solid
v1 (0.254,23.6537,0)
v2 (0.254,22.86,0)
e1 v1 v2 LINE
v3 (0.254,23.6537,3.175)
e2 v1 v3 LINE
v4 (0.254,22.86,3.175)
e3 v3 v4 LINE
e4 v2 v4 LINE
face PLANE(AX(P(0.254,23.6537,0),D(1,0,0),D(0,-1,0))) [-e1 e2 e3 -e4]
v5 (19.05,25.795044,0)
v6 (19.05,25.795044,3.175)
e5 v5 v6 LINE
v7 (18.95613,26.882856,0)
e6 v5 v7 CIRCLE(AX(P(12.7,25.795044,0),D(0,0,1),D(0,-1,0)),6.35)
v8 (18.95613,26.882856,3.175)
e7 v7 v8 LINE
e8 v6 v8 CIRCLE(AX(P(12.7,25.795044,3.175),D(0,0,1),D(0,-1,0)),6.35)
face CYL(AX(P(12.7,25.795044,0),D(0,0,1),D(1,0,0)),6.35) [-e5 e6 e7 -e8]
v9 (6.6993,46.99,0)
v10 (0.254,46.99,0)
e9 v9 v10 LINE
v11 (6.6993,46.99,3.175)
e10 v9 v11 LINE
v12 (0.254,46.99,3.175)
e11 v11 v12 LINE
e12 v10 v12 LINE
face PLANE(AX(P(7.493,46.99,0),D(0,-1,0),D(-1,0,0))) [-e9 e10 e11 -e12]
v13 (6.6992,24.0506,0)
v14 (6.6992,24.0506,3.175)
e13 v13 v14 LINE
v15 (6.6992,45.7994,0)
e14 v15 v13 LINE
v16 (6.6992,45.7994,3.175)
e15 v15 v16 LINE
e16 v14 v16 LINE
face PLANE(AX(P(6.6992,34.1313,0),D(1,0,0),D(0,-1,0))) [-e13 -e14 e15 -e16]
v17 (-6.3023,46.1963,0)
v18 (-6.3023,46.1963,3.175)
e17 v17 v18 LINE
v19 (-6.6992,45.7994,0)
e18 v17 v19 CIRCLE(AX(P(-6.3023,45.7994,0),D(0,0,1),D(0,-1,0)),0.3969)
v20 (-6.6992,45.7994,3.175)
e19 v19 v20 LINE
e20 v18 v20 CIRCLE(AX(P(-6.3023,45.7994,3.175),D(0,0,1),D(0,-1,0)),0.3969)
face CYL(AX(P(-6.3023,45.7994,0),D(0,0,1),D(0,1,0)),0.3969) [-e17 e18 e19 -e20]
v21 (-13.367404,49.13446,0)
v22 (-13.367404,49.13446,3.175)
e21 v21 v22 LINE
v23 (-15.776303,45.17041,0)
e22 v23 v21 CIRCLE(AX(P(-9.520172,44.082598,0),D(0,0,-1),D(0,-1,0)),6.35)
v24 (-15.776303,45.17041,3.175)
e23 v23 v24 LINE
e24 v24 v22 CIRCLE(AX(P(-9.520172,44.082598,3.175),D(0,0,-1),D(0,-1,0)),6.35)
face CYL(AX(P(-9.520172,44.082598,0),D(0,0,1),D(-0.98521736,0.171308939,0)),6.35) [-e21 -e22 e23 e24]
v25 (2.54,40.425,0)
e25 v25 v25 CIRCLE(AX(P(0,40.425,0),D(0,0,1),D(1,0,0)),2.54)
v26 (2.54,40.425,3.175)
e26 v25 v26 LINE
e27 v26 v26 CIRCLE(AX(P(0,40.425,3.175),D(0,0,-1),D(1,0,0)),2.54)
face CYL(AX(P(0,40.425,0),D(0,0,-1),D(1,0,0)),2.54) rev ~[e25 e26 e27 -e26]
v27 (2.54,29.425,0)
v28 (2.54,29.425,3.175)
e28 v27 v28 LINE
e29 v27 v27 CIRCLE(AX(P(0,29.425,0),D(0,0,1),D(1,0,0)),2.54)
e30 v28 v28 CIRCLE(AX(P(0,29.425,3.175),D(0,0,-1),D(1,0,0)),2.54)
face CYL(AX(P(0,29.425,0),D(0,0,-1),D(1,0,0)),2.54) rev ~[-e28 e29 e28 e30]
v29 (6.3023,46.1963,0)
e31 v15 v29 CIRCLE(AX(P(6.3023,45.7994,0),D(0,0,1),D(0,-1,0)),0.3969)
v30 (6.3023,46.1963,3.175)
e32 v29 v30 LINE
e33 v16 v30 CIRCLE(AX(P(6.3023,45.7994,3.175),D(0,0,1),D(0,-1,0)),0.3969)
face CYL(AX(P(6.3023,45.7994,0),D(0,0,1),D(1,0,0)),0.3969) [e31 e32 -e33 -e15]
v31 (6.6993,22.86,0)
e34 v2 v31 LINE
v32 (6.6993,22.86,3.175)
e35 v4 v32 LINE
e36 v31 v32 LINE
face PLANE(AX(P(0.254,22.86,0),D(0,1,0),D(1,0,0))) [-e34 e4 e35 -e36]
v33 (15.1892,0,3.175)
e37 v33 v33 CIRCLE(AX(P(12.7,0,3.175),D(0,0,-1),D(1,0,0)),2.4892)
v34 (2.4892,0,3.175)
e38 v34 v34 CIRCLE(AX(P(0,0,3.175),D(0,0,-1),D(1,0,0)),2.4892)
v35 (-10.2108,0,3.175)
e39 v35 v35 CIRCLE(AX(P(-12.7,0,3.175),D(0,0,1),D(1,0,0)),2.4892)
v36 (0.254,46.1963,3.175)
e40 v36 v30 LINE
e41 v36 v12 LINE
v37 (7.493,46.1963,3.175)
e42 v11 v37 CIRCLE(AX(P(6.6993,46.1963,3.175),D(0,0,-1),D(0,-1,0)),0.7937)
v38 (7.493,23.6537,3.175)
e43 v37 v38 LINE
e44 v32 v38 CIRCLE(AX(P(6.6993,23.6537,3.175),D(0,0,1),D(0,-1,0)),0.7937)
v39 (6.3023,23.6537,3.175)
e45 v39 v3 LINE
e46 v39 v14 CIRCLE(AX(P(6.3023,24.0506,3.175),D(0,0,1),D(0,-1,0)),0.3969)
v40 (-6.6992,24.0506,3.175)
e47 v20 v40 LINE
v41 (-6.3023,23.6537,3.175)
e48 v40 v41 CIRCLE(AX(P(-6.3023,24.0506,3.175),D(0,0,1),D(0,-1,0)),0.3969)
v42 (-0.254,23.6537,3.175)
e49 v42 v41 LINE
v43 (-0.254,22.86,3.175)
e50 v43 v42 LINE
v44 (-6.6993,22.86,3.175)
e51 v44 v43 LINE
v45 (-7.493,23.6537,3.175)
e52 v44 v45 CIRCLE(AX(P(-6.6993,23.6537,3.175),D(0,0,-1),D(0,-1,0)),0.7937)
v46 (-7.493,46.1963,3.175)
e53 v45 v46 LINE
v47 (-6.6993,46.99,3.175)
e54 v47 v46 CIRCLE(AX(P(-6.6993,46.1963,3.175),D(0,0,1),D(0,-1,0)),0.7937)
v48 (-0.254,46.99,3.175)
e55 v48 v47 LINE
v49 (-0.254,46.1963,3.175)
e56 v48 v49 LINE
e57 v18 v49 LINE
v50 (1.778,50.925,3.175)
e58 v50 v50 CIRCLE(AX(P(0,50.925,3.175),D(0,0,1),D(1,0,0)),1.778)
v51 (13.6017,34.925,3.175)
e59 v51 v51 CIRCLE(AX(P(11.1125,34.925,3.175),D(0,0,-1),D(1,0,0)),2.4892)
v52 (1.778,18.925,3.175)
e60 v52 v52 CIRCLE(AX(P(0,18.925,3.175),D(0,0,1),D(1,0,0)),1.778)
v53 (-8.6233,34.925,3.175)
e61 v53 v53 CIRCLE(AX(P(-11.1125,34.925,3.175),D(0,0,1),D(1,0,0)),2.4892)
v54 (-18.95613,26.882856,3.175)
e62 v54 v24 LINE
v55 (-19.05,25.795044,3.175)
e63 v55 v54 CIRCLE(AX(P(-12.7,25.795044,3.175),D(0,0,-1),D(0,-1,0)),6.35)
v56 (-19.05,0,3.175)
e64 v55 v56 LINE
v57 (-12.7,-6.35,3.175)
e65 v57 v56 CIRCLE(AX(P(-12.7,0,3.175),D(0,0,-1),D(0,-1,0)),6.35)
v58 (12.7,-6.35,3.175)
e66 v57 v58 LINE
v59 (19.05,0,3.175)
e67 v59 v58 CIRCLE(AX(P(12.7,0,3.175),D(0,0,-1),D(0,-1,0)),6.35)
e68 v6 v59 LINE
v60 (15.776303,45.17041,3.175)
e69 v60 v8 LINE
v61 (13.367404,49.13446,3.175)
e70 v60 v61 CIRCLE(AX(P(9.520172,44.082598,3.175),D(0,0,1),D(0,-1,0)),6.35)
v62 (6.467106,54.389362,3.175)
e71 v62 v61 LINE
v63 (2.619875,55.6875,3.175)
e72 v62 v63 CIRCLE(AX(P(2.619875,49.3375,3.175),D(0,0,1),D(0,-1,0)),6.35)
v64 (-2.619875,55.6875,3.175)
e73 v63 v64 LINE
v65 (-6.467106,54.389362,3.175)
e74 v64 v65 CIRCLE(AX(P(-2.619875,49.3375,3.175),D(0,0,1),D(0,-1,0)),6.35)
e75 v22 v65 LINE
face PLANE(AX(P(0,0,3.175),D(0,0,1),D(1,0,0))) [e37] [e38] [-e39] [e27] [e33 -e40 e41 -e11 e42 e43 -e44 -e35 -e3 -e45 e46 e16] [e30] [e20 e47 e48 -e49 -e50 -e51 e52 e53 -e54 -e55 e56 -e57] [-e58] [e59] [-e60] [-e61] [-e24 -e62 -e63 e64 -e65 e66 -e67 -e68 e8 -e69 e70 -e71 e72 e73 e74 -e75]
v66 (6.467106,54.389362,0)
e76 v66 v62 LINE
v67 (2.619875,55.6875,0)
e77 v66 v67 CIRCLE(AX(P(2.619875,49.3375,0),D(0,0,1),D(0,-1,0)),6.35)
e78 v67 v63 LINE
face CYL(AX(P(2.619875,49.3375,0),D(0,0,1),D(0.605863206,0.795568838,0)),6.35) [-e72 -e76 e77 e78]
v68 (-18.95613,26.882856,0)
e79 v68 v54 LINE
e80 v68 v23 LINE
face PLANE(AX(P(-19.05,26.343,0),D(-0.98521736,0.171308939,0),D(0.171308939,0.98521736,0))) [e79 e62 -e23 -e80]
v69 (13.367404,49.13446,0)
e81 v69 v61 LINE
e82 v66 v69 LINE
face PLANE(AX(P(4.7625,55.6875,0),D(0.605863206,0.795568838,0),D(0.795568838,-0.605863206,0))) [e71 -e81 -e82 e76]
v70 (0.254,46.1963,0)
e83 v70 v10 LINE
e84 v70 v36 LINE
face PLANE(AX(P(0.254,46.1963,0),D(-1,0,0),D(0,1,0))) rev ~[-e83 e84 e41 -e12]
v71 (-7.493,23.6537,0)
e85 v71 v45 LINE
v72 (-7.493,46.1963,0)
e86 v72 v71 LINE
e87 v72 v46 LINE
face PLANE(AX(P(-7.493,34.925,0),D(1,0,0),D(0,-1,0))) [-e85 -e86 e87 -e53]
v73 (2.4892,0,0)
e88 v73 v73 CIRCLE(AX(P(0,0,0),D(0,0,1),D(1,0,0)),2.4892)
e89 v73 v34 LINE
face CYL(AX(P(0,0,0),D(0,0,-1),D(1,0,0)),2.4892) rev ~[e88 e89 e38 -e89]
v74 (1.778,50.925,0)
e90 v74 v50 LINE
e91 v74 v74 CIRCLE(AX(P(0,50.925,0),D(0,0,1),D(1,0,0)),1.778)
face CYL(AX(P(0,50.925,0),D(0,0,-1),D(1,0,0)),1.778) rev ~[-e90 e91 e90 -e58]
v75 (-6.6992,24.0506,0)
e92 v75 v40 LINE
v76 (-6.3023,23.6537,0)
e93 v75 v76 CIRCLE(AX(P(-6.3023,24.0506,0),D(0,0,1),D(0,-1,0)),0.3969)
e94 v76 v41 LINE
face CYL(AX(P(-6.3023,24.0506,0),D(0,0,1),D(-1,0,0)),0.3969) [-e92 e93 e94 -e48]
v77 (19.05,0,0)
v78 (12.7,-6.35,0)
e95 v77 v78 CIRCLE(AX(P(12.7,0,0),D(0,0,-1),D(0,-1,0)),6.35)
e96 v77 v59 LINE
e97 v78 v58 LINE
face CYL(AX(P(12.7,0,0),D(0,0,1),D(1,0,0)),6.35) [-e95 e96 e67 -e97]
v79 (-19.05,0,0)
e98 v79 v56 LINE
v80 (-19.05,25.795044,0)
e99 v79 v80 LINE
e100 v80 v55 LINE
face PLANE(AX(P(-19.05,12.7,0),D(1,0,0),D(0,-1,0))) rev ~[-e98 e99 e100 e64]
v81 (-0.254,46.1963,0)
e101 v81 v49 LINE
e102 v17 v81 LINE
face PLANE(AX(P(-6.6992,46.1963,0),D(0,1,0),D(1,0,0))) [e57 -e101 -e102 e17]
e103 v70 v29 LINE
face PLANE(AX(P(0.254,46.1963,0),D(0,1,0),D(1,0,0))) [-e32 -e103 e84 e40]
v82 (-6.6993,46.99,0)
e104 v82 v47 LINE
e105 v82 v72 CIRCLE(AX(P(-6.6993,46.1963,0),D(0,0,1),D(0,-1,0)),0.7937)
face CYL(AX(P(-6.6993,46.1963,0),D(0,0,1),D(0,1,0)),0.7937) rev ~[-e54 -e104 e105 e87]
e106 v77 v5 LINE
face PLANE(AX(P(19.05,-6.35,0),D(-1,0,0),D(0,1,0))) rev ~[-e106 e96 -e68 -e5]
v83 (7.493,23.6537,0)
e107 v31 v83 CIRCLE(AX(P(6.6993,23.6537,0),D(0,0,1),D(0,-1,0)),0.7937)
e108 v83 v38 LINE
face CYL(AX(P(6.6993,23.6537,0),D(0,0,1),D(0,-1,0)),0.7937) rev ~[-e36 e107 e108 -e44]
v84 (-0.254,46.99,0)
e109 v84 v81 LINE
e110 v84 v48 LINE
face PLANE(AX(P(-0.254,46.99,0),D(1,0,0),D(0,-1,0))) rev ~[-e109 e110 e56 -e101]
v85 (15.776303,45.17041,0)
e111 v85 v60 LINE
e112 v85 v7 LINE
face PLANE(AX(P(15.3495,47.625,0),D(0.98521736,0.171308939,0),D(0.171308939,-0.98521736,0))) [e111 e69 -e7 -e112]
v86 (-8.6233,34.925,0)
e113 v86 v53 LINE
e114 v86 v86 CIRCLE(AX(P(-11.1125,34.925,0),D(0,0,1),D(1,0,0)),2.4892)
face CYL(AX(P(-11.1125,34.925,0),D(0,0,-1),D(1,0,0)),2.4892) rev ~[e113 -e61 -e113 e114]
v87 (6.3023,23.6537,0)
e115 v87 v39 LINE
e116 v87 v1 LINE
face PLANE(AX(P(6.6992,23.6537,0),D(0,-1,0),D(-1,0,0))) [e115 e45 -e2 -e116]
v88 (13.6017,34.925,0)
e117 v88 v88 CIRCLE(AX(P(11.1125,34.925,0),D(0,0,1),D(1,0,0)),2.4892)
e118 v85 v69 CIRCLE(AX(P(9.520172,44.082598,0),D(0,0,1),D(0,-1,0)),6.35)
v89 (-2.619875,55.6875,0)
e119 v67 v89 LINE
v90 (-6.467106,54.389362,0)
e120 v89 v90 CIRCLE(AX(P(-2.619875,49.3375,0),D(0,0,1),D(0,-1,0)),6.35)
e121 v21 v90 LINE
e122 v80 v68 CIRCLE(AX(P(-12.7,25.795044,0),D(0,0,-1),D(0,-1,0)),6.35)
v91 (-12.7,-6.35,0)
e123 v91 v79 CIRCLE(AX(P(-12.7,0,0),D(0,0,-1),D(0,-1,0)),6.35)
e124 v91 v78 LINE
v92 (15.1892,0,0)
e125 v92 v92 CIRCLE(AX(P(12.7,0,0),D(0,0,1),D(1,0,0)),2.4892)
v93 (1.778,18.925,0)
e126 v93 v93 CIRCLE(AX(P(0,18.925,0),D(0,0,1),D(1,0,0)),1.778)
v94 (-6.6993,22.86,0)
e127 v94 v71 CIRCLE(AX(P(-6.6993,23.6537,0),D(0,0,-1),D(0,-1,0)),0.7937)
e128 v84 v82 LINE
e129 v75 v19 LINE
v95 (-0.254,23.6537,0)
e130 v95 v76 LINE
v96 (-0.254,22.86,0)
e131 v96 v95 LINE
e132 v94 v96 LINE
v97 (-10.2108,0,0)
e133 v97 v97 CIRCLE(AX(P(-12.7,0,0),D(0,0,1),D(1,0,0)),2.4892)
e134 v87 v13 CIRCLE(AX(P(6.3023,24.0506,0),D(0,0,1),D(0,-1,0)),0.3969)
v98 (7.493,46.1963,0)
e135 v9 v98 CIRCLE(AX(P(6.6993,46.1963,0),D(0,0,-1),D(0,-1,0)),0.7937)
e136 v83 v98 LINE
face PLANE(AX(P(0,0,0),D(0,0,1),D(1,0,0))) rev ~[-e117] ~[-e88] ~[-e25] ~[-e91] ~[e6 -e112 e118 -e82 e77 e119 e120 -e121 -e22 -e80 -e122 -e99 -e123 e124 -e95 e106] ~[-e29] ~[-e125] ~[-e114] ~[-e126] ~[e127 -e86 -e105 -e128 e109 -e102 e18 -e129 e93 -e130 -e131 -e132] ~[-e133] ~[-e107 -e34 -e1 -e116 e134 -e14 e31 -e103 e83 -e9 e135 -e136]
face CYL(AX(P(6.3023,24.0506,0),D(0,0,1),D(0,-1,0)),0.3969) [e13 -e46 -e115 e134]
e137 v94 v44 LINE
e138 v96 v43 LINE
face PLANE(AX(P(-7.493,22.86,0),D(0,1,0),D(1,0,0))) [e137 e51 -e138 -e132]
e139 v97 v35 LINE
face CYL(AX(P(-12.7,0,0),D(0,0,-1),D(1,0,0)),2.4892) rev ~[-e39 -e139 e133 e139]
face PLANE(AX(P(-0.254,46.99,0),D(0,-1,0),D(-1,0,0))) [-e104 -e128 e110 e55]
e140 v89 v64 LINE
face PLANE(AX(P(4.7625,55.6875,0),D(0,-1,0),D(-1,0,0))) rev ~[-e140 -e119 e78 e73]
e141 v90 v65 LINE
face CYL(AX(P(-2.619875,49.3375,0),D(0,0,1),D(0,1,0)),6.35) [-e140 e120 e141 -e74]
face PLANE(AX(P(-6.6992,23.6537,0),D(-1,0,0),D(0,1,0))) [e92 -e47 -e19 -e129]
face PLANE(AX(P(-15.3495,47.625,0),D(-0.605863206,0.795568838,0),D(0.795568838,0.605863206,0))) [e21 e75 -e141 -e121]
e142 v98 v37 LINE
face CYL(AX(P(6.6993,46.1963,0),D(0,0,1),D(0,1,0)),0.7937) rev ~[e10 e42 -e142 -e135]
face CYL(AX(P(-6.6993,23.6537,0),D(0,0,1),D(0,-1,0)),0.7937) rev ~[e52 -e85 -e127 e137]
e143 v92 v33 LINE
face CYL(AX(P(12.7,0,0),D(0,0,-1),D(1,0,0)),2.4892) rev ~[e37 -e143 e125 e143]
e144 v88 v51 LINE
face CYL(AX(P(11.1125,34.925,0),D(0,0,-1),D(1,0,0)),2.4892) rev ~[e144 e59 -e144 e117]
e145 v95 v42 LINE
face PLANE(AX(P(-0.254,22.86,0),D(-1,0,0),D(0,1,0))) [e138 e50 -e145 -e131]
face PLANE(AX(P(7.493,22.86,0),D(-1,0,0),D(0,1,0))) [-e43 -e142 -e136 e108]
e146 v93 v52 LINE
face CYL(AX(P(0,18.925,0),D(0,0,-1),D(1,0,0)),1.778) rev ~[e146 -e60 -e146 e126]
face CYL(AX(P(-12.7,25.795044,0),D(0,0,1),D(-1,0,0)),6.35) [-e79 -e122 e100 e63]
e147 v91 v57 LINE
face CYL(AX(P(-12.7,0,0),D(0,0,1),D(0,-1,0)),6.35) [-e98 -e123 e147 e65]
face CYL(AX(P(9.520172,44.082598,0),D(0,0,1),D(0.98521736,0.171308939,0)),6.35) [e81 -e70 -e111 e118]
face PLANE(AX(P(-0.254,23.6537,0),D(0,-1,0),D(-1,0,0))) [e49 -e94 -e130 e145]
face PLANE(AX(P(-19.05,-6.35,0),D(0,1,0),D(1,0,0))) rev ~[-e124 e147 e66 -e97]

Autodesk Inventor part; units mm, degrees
ref_plane "YZ Plane" through (0, 0, 0) normal (1, 0, 0) x (0, 1, 0)
ref_plane "XZ Plane" through (0, 0, 0) normal (0, 1, 0) x (-1, 0, 0)
ref_plane "XY Plane" through (0, 0, 0) normal (0, 0, 1) x (1, 0, 0)
sketch "Sketch1" plane through (0, 0, 0) normal (0, 0, 1) x (1, 0, 0)
  line L0 (19.05, 12.7) -> (-19.05, 12.7)
  line L1 (-19.05, 12.7) -> (-19.05, -12.7)
  line L2 (-19.05, -12.7) -> (19.05, -12.7)
  line L3 (19.05, -12.7) -> (19.05, 12.7)
  circle A0 centre (-12.7, 0) radius 2.4892
  line L4 (-12.7, 0) -> (12.7, 0)
  circle A1 centre (12.7, 0) radius 2.4892
  line L5 (-19.05, -6.35) -> (19.05, -6.35)
  circle A2 centre (-11.1125, 34.925) radius 2.4892
  line L6 (-11.1125, 34.925) -> (11.1125, 34.925)
  circle A3 centre (11.1125, 34.925) radius 2.4892
  line L7 (-19.05, 12.7) -> (-19.05, 26.343)
  line L8 (-19.05, 26.343) -> (-15.3495, 47.625)
  line L9 (-15.3495, 47.625) -> (15.3495, 47.625)
  line L10 (15.3495, 47.625) -> (19.05, 26.343)
  line L11 (19.05, 26.343) -> (19.05, 12.7)
  circle A4 centre (-11.1125, 34.925) radius 6.35 construction
  circle A5 centre (0, 29.425) radius 2.54
  circle A6 centre (0, 40.425) radius 2.54
  line L12 (0, 40.425) -> (0, 29.425)
  circle A7 centre (0, 0) radius 2.4892
  line L13 (7.493, 46.99) -> (-7.493, 46.99)
  line L14 (-7.493, 46.99) -> (-7.493, 22.86)
  line L15 (-7.493, 22.86) -> (7.493, 22.86)
  line L16 (7.493, 22.86) -> (7.493, 46.99)
  line L17 (7.493, 46.99) -> (-7.493, 22.86) construction
  line L18 (-7.493, 46.99) -> (7.493, 22.86) construction
  circle A8 centre (0, 50.925) radius 1.778
  circle A9 centre (0, 18.925) radius 1.778
  line L19 (-15.3495, 47.625) -> (-4.7625, 55.6875)
  line L20 (4.7625, 55.6875) -> (15.3495, 47.625)
  line L21 (-7.493, 34.925) -> (7.493, 34.925) construction
  line L22 (-7.493, 37.3062) -> (7.493, 37.3062)
  line L23 (-7.493, 34.1313) -> (7.493, 34.1313)
  line L24 (4.7625, 55.6875) -> (-4.7625, 55.6875)
  line L25 (7.493, 37.3062) -> (7.493, 34.1313)
  line L26 (-7.493, 37.3062) -> (-7.493, 34.1313)
  line L27 (-6.6992, 46.1963) -> (6.6992, 46.1963)
  line L28 (6.6992, 46.1963) -> (6.6992, 23.6537)
  line L29 (6.6992, 23.6537) -> (-6.6992, 23.6537)
  line L30 (-6.6992, 23.6537) -> (-6.6992, 46.1963)
  line L31 (0.254, 46.99) -> (-0.254, 46.99)
  line L32 (-0.254, 46.99) -> (-0.254, 46.1963)
  line L33 (-0.254, 46.1963) -> (0.254, 46.1963)
  line L34 (0.254, 46.1963) -> (0.254, 46.99)
  line L35 (0.254, 46.99) -> (-0.254, 46.1963) construction
  line L36 (-0.254, 46.99) -> (0.254, 46.1963) construction
  line L37 (0.254, 22.86) -> (-0.254, 22.86)
  line L38 (-0.254, 22.86) -> (-0.254, 23.6537)
  line L39 (-0.254, 23.6537) -> (0.254, 23.6537)
  line L40 (0.254, 23.6537) -> (0.254, 22.86)
  line L41 (0.254, 22.86) -> (-0.254, 23.6537) construction
  line L42 (-0.254, 22.86) -> (0.254, 23.6537) construction
  point P0 (0, 12.7)
  point P1 (0, 47.625)
  point P2 (0, 34.925)
  point P3 (0, 34.925)
  point P4 (0, 34.925)
  point P5 (-7.493, 34.1313)
  point P6 (7.493, 34.1313)
  point P7 (7.493, 37.3062)
  point P8 (-7.493, 37.3062)
  point P9 (0, 55.6875)
  point P10 (0, -12.7)
  point P11 (0, 46.5931)
  point P12 (0, 46.5931)
  point P13 (0, 23.2569)
  point P14 (0, 23.2569)
  dimension "d0" = 38.1
  dimension "d1" = 25.4
  dimension "d2" = 4.9784
  dimension "d3" = 4.9784
  dimension "d4" = 25.4
  dimension "d5" = 6.35
  dimension "d6" = 4.9784
  dimension "d7" = 22.225
  dimension "d8" = 22.225
  dimension "d9" = 21.282
  dimension "d10" = 12.7
  dimension "d11" = 12.7
  dimension "d12" = 5.08
  dimension "d13" = 11
  dimension "d17" = 24.13
  dimension "d18" = 14.986
  dimension "d19" = 3.556
  dimension "d22" = 360
  dimension "d24" = 32
  dimension "d29" = 0.7937
  dimension "d31" = 3.175
  dimension "d32" = 4.7625
  dimension "d33" = 9.525
  dimension "d51" = 12.7
  dimension "d52" = 6.35
  dimension "d53" = 0.7937
  dimension "d54" = 0.508
extrude "Plate1" add sketch "Sketch1" along normal blind 3.175 contours L3 L5 L1 L0 | L0 L7 L8 L9 L10 L11 | L9 L19 L24 L20 | L30 L22 L12 L6 | L6 L12 L23 L30 | L12 L22 L28 L6 | L6 L28 L23 L12 | L23 L28 L29 L30 | L30 L27 L28 L22 | L13 L34 L27 L32 | L38 L29 L40 L15
fillet "Corner Round2" radius 6.35 8 edges at (19.05, -6.35, 1.5875) (-19.05, -6.35, 1.5875) (19.05, 26.343, 1.5875) (-15.3495, 47.625, 1.5875) (-4.7625, 55.6875, 1.5875) (4.7625, 55.6875, 1.5875) (15.3495, 47.625, 1.5875) (-19.05, 26.343, 1.5875)
cut "Cut1" [suppressed]
fillet "Corner Round3" radius 0.7937 4 edges at (-7.493, 46.99, 1.5875) (-7.493, 22.86, 1.5875) (7.493, 22.86, 1.5875) (7.493, 46.99, 1.5875)
fillet "Corner Round4" radius 0.3969 4 edges at (6.6992, 46.1963, 1.5875) (-6.6992, 46.1963, 1.5875) (-6.6992, 23.6537, 1.5875) (6.6992, 23.6537, 1.5875)
sketch "Sketch4" plane through (0, 0, 3.175) normal (0, 0, 1) x (1, 0, 0)
  line L0 (0.254, 46.99) -> (6.6992, 46.99) projected
  arc A0 (7.493, 46.1963) -> (6.6992, 46.99) centre (6.6992, 46.1963) ccw projected
  line L1 (7.493, 46.1963) -> (7.493, 23.6538) projected
  arc A1 (6.6992, 22.86) -> (7.493, 23.6538) centre (6.6992, 23.6538) ccw projected
  line L2 (6.6992, 22.86) -> (0.254, 22.86) projected
  arc A2 (-7.493, 23.6538) -> (-6.6993, 22.86) centre (-6.6993, 23.6538) ccw projected
  line L3 (-7.493, 23.6538) -> (-7.493, 46.1963) projected
  arc A3 (-6.6993, 46.99) -> (-7.493, 46.1963) centre (-6.6993, 46.1963) ccw projected
  arc A4 (-18.9561, 26.8828) -> (-19.05, 25.795) centre (-12.7, 25.795) ccw projected
  line L4 (-19.05, 0) -> (-19.05, 25.795) projected
  arc A5 (-19.05, 0) -> (-12.7, -6.35) centre (-12.7, 0) ccw projected
  line L5 (12.7, -6.35) -> (-12.7, -6.35) projected
  arc A6 (12.7, -6.35) -> (19.05, 0) centre (12.7, 0) ccw projected
  line L6 (19.05, 25.795) -> (19.05, 0) projected
  arc A7 (19.05, 25.795) -> (18.9561, 26.8828) centre (12.7, 25.795) ccw projected
  line L7 (15.7763, 45.1704) -> (18.9561, 26.8828) projected
  arc A8 (15.7763, 45.1704) -> (13.3674, 49.1345) centre (9.5202, 44.0826) ccw projected
  line L8 (6.4671, 54.3894) -> (13.3674, 49.1345) projected
  arc A9 (6.4671, 54.3894) -> (2.6199, 55.6875) centre (2.6199, 49.3375) ccw projected
  line L9 (-2.6199, 55.6875) -> (2.6199, 55.6875) projected
  arc A10 (-2.6199, 55.6875) -> (-6.4671, 54.3894) centre (-2.6199, 49.3375) ccw projected
  line L10 (-13.3674, 49.1345) -> (-6.4671, 54.3894) projected
  arc A11 (-13.3674, 49.1345) -> (-15.7763, 45.1704) centre (-9.5202, 44.0826) ccw projected
  line L11 (-18.9561, 26.8828) -> (-15.7763, 45.1704) projected
  circle A12 centre (11.1125, 34.925) radius 2.4892 projected
  circle A13 centre (-11.1125, 34.925) radius 2.4892 projected
  circle A14 centre (0, 18.925) radius 1.778 projected
  circle A15 centre (0, 0) radius 2.4892 projected
  circle A16 centre (12.7, 0) radius 2.4892 projected
  circle A17 centre (-12.7, 0) radius 2.4892 projected
  circle A18 centre (0, 50.925) radius 1.778 projected
  line L12 (-27.7407, 9.4742) -> (24.6669, 9.4742)
  arc A19 (-11.4438, 46.6085) -> (-12.6483, 44.6265) centre (-9.5202, 44.0826) ccw
  line L13 (-11.4438, 46.6085) -> (-4.5435, 51.8634)
  arc A20 (-2.6199, 52.5125) -> (-4.5435, 51.8634) centre (-2.6199, 49.3375) ccw
  line L14 (-2.6199, 52.5125) -> (2.6199, 52.5125)
  arc A21 (4.5435, 51.8634) -> (2.6199, 52.5125) centre (2.6199, 49.3375) ccw
  line L15 (4.5435, 51.8634) -> (11.4438, 46.6085)
  arc A22 (12.6483, 44.6265) -> (11.4438, 46.6085) centre (9.5202, 44.0826) ccw
  line L16 (12.6483, 44.6265) -> (15.8281, 26.3389)
  arc A23 (15.875, 25.795) -> (15.8281, 26.3389) centre (12.7, 25.795) ccw
  line L17 (15.875, 25.795) -> (15.875, 0)
  arc A24 (12.7, -3.175) -> (15.875, 0) centre (12.7, 0) ccw
  line L18 (12.7, -3.175) -> (-12.7, -3.175)
  arc A25 (-15.875, 0) -> (-12.7, -3.175) centre (-12.7, 0) ccw
  line L19 (-15.875, 0) -> (-15.875, 25.795)
  arc A26 (-15.8281, 26.3389) -> (-15.875, 25.795) centre (-12.7, 25.795) ccw
  line L20 (-15.8281, 26.3389) -> (-12.6483, 44.6265)
  line L21 (-8.6233, 15.877) -> (8.6233, 15.877)
  line L22 (8.6233, 15.877) -> (15.8281, 26.3389)
  line L23 (-8.6233, 15.877) -> (-15.8281, 26.3389)
  line L24 (-8.6233, 15.877) -> (-8.6233, 5.6134)
  line L25 (-8.6233, 5.6134) -> (-15.875, 5.6134)
  line L26 (8.6233, 15.877) -> (8.6233, 5.6134)
  line L27 (8.6233, 5.6134) -> (15.875, 5.6134)
  line L28 (-10.0711, 17.9793) -> (-10.0711, 5.6134)
  line L29 (10.0711, 17.9793) -> (10.0711, 5.6134)
  arc A27 (6.3024, 23.6537) -> (6.6992, 24.0506) centre (6.3024, 24.0506) ccw projected
  line L30 (6.6992, 45.7994) -> (6.6992, 24.0506) projected
  arc A28 (6.6992, 45.7994) -> (6.3024, 46.1963) centre (6.3024, 45.7994) ccw projected
  line L31 (0.254, 46.1963) -> (6.3024, 46.1963) projected
  line L32 (0.254, 46.99) -> (0.254, 46.1963) projected
  line L33 (0.254, 23.6537) -> (0.254, 22.86) projected
  line L34 (6.3024, 23.6537) -> (0.254, 23.6537) projected
  arc A29 (-6.6992, 24.0506) -> (-6.3024, 23.6537) centre (-6.3024, 24.0506) ccw projected
  line L35 (-0.254, 23.6537) -> (-6.3024, 23.6537) projected
  line L36 (-0.254, 22.86) -> (-0.254, 23.6537) projected
  line L37 (-0.254, 22.86) -> (-6.6993, 22.86) projected
  line L38 (-6.6993, 46.99) -> (-0.254, 46.99) projected
  line L39 (-0.254, 46.1963) -> (-0.254, 46.99) projected
  line L40 (-6.3024, 46.1963) -> (-0.254, 46.1963) projected
  arc A30 (-6.3024, 46.1963) -> (-6.6992, 45.7994) centre (-6.3024, 45.7994) ccw projected
  line L41 (-6.6992, 24.0506) -> (-6.6992, 45.7994) projected
  point P0 (0, 15.877)
  dimension "d59" = 9.4742
  dimension "d60" = 3.175
  dimension "d61" = 17.2466
  dimension "d62" = 3.048
  dimension "d63" = 1.4478
  dimension "d67" = 5.6134
cut "Cut2" [suppressed]
feature "Corner Round5" [suppressed]
equation "\"d55\" = Thickness"
equation "\"d64\" = Thickness"
equation "\"d35\" = Thickness"
equation "\"BendReliefWidth\" = Thickness"
equation "\"BendReliefDepth\" = 0.5 * Thickness"
equation "\"CornerReliefSize\" = 4 * Thickness"
equation "\"MinimumRemnant\" = 2 * Thickness"
equation "\"TransitionRadius\" = BendRadius"
equation "\"JacobiRadiusSize\" = BendRadius"
equation "\"GapSize\" = Thickness"
equation "\"Thickness\" = 3.175"
equation "\"BendRadius\" = 0.79375"
properties part number "Standard Sensor Mount" material "Aluminum 6061"
